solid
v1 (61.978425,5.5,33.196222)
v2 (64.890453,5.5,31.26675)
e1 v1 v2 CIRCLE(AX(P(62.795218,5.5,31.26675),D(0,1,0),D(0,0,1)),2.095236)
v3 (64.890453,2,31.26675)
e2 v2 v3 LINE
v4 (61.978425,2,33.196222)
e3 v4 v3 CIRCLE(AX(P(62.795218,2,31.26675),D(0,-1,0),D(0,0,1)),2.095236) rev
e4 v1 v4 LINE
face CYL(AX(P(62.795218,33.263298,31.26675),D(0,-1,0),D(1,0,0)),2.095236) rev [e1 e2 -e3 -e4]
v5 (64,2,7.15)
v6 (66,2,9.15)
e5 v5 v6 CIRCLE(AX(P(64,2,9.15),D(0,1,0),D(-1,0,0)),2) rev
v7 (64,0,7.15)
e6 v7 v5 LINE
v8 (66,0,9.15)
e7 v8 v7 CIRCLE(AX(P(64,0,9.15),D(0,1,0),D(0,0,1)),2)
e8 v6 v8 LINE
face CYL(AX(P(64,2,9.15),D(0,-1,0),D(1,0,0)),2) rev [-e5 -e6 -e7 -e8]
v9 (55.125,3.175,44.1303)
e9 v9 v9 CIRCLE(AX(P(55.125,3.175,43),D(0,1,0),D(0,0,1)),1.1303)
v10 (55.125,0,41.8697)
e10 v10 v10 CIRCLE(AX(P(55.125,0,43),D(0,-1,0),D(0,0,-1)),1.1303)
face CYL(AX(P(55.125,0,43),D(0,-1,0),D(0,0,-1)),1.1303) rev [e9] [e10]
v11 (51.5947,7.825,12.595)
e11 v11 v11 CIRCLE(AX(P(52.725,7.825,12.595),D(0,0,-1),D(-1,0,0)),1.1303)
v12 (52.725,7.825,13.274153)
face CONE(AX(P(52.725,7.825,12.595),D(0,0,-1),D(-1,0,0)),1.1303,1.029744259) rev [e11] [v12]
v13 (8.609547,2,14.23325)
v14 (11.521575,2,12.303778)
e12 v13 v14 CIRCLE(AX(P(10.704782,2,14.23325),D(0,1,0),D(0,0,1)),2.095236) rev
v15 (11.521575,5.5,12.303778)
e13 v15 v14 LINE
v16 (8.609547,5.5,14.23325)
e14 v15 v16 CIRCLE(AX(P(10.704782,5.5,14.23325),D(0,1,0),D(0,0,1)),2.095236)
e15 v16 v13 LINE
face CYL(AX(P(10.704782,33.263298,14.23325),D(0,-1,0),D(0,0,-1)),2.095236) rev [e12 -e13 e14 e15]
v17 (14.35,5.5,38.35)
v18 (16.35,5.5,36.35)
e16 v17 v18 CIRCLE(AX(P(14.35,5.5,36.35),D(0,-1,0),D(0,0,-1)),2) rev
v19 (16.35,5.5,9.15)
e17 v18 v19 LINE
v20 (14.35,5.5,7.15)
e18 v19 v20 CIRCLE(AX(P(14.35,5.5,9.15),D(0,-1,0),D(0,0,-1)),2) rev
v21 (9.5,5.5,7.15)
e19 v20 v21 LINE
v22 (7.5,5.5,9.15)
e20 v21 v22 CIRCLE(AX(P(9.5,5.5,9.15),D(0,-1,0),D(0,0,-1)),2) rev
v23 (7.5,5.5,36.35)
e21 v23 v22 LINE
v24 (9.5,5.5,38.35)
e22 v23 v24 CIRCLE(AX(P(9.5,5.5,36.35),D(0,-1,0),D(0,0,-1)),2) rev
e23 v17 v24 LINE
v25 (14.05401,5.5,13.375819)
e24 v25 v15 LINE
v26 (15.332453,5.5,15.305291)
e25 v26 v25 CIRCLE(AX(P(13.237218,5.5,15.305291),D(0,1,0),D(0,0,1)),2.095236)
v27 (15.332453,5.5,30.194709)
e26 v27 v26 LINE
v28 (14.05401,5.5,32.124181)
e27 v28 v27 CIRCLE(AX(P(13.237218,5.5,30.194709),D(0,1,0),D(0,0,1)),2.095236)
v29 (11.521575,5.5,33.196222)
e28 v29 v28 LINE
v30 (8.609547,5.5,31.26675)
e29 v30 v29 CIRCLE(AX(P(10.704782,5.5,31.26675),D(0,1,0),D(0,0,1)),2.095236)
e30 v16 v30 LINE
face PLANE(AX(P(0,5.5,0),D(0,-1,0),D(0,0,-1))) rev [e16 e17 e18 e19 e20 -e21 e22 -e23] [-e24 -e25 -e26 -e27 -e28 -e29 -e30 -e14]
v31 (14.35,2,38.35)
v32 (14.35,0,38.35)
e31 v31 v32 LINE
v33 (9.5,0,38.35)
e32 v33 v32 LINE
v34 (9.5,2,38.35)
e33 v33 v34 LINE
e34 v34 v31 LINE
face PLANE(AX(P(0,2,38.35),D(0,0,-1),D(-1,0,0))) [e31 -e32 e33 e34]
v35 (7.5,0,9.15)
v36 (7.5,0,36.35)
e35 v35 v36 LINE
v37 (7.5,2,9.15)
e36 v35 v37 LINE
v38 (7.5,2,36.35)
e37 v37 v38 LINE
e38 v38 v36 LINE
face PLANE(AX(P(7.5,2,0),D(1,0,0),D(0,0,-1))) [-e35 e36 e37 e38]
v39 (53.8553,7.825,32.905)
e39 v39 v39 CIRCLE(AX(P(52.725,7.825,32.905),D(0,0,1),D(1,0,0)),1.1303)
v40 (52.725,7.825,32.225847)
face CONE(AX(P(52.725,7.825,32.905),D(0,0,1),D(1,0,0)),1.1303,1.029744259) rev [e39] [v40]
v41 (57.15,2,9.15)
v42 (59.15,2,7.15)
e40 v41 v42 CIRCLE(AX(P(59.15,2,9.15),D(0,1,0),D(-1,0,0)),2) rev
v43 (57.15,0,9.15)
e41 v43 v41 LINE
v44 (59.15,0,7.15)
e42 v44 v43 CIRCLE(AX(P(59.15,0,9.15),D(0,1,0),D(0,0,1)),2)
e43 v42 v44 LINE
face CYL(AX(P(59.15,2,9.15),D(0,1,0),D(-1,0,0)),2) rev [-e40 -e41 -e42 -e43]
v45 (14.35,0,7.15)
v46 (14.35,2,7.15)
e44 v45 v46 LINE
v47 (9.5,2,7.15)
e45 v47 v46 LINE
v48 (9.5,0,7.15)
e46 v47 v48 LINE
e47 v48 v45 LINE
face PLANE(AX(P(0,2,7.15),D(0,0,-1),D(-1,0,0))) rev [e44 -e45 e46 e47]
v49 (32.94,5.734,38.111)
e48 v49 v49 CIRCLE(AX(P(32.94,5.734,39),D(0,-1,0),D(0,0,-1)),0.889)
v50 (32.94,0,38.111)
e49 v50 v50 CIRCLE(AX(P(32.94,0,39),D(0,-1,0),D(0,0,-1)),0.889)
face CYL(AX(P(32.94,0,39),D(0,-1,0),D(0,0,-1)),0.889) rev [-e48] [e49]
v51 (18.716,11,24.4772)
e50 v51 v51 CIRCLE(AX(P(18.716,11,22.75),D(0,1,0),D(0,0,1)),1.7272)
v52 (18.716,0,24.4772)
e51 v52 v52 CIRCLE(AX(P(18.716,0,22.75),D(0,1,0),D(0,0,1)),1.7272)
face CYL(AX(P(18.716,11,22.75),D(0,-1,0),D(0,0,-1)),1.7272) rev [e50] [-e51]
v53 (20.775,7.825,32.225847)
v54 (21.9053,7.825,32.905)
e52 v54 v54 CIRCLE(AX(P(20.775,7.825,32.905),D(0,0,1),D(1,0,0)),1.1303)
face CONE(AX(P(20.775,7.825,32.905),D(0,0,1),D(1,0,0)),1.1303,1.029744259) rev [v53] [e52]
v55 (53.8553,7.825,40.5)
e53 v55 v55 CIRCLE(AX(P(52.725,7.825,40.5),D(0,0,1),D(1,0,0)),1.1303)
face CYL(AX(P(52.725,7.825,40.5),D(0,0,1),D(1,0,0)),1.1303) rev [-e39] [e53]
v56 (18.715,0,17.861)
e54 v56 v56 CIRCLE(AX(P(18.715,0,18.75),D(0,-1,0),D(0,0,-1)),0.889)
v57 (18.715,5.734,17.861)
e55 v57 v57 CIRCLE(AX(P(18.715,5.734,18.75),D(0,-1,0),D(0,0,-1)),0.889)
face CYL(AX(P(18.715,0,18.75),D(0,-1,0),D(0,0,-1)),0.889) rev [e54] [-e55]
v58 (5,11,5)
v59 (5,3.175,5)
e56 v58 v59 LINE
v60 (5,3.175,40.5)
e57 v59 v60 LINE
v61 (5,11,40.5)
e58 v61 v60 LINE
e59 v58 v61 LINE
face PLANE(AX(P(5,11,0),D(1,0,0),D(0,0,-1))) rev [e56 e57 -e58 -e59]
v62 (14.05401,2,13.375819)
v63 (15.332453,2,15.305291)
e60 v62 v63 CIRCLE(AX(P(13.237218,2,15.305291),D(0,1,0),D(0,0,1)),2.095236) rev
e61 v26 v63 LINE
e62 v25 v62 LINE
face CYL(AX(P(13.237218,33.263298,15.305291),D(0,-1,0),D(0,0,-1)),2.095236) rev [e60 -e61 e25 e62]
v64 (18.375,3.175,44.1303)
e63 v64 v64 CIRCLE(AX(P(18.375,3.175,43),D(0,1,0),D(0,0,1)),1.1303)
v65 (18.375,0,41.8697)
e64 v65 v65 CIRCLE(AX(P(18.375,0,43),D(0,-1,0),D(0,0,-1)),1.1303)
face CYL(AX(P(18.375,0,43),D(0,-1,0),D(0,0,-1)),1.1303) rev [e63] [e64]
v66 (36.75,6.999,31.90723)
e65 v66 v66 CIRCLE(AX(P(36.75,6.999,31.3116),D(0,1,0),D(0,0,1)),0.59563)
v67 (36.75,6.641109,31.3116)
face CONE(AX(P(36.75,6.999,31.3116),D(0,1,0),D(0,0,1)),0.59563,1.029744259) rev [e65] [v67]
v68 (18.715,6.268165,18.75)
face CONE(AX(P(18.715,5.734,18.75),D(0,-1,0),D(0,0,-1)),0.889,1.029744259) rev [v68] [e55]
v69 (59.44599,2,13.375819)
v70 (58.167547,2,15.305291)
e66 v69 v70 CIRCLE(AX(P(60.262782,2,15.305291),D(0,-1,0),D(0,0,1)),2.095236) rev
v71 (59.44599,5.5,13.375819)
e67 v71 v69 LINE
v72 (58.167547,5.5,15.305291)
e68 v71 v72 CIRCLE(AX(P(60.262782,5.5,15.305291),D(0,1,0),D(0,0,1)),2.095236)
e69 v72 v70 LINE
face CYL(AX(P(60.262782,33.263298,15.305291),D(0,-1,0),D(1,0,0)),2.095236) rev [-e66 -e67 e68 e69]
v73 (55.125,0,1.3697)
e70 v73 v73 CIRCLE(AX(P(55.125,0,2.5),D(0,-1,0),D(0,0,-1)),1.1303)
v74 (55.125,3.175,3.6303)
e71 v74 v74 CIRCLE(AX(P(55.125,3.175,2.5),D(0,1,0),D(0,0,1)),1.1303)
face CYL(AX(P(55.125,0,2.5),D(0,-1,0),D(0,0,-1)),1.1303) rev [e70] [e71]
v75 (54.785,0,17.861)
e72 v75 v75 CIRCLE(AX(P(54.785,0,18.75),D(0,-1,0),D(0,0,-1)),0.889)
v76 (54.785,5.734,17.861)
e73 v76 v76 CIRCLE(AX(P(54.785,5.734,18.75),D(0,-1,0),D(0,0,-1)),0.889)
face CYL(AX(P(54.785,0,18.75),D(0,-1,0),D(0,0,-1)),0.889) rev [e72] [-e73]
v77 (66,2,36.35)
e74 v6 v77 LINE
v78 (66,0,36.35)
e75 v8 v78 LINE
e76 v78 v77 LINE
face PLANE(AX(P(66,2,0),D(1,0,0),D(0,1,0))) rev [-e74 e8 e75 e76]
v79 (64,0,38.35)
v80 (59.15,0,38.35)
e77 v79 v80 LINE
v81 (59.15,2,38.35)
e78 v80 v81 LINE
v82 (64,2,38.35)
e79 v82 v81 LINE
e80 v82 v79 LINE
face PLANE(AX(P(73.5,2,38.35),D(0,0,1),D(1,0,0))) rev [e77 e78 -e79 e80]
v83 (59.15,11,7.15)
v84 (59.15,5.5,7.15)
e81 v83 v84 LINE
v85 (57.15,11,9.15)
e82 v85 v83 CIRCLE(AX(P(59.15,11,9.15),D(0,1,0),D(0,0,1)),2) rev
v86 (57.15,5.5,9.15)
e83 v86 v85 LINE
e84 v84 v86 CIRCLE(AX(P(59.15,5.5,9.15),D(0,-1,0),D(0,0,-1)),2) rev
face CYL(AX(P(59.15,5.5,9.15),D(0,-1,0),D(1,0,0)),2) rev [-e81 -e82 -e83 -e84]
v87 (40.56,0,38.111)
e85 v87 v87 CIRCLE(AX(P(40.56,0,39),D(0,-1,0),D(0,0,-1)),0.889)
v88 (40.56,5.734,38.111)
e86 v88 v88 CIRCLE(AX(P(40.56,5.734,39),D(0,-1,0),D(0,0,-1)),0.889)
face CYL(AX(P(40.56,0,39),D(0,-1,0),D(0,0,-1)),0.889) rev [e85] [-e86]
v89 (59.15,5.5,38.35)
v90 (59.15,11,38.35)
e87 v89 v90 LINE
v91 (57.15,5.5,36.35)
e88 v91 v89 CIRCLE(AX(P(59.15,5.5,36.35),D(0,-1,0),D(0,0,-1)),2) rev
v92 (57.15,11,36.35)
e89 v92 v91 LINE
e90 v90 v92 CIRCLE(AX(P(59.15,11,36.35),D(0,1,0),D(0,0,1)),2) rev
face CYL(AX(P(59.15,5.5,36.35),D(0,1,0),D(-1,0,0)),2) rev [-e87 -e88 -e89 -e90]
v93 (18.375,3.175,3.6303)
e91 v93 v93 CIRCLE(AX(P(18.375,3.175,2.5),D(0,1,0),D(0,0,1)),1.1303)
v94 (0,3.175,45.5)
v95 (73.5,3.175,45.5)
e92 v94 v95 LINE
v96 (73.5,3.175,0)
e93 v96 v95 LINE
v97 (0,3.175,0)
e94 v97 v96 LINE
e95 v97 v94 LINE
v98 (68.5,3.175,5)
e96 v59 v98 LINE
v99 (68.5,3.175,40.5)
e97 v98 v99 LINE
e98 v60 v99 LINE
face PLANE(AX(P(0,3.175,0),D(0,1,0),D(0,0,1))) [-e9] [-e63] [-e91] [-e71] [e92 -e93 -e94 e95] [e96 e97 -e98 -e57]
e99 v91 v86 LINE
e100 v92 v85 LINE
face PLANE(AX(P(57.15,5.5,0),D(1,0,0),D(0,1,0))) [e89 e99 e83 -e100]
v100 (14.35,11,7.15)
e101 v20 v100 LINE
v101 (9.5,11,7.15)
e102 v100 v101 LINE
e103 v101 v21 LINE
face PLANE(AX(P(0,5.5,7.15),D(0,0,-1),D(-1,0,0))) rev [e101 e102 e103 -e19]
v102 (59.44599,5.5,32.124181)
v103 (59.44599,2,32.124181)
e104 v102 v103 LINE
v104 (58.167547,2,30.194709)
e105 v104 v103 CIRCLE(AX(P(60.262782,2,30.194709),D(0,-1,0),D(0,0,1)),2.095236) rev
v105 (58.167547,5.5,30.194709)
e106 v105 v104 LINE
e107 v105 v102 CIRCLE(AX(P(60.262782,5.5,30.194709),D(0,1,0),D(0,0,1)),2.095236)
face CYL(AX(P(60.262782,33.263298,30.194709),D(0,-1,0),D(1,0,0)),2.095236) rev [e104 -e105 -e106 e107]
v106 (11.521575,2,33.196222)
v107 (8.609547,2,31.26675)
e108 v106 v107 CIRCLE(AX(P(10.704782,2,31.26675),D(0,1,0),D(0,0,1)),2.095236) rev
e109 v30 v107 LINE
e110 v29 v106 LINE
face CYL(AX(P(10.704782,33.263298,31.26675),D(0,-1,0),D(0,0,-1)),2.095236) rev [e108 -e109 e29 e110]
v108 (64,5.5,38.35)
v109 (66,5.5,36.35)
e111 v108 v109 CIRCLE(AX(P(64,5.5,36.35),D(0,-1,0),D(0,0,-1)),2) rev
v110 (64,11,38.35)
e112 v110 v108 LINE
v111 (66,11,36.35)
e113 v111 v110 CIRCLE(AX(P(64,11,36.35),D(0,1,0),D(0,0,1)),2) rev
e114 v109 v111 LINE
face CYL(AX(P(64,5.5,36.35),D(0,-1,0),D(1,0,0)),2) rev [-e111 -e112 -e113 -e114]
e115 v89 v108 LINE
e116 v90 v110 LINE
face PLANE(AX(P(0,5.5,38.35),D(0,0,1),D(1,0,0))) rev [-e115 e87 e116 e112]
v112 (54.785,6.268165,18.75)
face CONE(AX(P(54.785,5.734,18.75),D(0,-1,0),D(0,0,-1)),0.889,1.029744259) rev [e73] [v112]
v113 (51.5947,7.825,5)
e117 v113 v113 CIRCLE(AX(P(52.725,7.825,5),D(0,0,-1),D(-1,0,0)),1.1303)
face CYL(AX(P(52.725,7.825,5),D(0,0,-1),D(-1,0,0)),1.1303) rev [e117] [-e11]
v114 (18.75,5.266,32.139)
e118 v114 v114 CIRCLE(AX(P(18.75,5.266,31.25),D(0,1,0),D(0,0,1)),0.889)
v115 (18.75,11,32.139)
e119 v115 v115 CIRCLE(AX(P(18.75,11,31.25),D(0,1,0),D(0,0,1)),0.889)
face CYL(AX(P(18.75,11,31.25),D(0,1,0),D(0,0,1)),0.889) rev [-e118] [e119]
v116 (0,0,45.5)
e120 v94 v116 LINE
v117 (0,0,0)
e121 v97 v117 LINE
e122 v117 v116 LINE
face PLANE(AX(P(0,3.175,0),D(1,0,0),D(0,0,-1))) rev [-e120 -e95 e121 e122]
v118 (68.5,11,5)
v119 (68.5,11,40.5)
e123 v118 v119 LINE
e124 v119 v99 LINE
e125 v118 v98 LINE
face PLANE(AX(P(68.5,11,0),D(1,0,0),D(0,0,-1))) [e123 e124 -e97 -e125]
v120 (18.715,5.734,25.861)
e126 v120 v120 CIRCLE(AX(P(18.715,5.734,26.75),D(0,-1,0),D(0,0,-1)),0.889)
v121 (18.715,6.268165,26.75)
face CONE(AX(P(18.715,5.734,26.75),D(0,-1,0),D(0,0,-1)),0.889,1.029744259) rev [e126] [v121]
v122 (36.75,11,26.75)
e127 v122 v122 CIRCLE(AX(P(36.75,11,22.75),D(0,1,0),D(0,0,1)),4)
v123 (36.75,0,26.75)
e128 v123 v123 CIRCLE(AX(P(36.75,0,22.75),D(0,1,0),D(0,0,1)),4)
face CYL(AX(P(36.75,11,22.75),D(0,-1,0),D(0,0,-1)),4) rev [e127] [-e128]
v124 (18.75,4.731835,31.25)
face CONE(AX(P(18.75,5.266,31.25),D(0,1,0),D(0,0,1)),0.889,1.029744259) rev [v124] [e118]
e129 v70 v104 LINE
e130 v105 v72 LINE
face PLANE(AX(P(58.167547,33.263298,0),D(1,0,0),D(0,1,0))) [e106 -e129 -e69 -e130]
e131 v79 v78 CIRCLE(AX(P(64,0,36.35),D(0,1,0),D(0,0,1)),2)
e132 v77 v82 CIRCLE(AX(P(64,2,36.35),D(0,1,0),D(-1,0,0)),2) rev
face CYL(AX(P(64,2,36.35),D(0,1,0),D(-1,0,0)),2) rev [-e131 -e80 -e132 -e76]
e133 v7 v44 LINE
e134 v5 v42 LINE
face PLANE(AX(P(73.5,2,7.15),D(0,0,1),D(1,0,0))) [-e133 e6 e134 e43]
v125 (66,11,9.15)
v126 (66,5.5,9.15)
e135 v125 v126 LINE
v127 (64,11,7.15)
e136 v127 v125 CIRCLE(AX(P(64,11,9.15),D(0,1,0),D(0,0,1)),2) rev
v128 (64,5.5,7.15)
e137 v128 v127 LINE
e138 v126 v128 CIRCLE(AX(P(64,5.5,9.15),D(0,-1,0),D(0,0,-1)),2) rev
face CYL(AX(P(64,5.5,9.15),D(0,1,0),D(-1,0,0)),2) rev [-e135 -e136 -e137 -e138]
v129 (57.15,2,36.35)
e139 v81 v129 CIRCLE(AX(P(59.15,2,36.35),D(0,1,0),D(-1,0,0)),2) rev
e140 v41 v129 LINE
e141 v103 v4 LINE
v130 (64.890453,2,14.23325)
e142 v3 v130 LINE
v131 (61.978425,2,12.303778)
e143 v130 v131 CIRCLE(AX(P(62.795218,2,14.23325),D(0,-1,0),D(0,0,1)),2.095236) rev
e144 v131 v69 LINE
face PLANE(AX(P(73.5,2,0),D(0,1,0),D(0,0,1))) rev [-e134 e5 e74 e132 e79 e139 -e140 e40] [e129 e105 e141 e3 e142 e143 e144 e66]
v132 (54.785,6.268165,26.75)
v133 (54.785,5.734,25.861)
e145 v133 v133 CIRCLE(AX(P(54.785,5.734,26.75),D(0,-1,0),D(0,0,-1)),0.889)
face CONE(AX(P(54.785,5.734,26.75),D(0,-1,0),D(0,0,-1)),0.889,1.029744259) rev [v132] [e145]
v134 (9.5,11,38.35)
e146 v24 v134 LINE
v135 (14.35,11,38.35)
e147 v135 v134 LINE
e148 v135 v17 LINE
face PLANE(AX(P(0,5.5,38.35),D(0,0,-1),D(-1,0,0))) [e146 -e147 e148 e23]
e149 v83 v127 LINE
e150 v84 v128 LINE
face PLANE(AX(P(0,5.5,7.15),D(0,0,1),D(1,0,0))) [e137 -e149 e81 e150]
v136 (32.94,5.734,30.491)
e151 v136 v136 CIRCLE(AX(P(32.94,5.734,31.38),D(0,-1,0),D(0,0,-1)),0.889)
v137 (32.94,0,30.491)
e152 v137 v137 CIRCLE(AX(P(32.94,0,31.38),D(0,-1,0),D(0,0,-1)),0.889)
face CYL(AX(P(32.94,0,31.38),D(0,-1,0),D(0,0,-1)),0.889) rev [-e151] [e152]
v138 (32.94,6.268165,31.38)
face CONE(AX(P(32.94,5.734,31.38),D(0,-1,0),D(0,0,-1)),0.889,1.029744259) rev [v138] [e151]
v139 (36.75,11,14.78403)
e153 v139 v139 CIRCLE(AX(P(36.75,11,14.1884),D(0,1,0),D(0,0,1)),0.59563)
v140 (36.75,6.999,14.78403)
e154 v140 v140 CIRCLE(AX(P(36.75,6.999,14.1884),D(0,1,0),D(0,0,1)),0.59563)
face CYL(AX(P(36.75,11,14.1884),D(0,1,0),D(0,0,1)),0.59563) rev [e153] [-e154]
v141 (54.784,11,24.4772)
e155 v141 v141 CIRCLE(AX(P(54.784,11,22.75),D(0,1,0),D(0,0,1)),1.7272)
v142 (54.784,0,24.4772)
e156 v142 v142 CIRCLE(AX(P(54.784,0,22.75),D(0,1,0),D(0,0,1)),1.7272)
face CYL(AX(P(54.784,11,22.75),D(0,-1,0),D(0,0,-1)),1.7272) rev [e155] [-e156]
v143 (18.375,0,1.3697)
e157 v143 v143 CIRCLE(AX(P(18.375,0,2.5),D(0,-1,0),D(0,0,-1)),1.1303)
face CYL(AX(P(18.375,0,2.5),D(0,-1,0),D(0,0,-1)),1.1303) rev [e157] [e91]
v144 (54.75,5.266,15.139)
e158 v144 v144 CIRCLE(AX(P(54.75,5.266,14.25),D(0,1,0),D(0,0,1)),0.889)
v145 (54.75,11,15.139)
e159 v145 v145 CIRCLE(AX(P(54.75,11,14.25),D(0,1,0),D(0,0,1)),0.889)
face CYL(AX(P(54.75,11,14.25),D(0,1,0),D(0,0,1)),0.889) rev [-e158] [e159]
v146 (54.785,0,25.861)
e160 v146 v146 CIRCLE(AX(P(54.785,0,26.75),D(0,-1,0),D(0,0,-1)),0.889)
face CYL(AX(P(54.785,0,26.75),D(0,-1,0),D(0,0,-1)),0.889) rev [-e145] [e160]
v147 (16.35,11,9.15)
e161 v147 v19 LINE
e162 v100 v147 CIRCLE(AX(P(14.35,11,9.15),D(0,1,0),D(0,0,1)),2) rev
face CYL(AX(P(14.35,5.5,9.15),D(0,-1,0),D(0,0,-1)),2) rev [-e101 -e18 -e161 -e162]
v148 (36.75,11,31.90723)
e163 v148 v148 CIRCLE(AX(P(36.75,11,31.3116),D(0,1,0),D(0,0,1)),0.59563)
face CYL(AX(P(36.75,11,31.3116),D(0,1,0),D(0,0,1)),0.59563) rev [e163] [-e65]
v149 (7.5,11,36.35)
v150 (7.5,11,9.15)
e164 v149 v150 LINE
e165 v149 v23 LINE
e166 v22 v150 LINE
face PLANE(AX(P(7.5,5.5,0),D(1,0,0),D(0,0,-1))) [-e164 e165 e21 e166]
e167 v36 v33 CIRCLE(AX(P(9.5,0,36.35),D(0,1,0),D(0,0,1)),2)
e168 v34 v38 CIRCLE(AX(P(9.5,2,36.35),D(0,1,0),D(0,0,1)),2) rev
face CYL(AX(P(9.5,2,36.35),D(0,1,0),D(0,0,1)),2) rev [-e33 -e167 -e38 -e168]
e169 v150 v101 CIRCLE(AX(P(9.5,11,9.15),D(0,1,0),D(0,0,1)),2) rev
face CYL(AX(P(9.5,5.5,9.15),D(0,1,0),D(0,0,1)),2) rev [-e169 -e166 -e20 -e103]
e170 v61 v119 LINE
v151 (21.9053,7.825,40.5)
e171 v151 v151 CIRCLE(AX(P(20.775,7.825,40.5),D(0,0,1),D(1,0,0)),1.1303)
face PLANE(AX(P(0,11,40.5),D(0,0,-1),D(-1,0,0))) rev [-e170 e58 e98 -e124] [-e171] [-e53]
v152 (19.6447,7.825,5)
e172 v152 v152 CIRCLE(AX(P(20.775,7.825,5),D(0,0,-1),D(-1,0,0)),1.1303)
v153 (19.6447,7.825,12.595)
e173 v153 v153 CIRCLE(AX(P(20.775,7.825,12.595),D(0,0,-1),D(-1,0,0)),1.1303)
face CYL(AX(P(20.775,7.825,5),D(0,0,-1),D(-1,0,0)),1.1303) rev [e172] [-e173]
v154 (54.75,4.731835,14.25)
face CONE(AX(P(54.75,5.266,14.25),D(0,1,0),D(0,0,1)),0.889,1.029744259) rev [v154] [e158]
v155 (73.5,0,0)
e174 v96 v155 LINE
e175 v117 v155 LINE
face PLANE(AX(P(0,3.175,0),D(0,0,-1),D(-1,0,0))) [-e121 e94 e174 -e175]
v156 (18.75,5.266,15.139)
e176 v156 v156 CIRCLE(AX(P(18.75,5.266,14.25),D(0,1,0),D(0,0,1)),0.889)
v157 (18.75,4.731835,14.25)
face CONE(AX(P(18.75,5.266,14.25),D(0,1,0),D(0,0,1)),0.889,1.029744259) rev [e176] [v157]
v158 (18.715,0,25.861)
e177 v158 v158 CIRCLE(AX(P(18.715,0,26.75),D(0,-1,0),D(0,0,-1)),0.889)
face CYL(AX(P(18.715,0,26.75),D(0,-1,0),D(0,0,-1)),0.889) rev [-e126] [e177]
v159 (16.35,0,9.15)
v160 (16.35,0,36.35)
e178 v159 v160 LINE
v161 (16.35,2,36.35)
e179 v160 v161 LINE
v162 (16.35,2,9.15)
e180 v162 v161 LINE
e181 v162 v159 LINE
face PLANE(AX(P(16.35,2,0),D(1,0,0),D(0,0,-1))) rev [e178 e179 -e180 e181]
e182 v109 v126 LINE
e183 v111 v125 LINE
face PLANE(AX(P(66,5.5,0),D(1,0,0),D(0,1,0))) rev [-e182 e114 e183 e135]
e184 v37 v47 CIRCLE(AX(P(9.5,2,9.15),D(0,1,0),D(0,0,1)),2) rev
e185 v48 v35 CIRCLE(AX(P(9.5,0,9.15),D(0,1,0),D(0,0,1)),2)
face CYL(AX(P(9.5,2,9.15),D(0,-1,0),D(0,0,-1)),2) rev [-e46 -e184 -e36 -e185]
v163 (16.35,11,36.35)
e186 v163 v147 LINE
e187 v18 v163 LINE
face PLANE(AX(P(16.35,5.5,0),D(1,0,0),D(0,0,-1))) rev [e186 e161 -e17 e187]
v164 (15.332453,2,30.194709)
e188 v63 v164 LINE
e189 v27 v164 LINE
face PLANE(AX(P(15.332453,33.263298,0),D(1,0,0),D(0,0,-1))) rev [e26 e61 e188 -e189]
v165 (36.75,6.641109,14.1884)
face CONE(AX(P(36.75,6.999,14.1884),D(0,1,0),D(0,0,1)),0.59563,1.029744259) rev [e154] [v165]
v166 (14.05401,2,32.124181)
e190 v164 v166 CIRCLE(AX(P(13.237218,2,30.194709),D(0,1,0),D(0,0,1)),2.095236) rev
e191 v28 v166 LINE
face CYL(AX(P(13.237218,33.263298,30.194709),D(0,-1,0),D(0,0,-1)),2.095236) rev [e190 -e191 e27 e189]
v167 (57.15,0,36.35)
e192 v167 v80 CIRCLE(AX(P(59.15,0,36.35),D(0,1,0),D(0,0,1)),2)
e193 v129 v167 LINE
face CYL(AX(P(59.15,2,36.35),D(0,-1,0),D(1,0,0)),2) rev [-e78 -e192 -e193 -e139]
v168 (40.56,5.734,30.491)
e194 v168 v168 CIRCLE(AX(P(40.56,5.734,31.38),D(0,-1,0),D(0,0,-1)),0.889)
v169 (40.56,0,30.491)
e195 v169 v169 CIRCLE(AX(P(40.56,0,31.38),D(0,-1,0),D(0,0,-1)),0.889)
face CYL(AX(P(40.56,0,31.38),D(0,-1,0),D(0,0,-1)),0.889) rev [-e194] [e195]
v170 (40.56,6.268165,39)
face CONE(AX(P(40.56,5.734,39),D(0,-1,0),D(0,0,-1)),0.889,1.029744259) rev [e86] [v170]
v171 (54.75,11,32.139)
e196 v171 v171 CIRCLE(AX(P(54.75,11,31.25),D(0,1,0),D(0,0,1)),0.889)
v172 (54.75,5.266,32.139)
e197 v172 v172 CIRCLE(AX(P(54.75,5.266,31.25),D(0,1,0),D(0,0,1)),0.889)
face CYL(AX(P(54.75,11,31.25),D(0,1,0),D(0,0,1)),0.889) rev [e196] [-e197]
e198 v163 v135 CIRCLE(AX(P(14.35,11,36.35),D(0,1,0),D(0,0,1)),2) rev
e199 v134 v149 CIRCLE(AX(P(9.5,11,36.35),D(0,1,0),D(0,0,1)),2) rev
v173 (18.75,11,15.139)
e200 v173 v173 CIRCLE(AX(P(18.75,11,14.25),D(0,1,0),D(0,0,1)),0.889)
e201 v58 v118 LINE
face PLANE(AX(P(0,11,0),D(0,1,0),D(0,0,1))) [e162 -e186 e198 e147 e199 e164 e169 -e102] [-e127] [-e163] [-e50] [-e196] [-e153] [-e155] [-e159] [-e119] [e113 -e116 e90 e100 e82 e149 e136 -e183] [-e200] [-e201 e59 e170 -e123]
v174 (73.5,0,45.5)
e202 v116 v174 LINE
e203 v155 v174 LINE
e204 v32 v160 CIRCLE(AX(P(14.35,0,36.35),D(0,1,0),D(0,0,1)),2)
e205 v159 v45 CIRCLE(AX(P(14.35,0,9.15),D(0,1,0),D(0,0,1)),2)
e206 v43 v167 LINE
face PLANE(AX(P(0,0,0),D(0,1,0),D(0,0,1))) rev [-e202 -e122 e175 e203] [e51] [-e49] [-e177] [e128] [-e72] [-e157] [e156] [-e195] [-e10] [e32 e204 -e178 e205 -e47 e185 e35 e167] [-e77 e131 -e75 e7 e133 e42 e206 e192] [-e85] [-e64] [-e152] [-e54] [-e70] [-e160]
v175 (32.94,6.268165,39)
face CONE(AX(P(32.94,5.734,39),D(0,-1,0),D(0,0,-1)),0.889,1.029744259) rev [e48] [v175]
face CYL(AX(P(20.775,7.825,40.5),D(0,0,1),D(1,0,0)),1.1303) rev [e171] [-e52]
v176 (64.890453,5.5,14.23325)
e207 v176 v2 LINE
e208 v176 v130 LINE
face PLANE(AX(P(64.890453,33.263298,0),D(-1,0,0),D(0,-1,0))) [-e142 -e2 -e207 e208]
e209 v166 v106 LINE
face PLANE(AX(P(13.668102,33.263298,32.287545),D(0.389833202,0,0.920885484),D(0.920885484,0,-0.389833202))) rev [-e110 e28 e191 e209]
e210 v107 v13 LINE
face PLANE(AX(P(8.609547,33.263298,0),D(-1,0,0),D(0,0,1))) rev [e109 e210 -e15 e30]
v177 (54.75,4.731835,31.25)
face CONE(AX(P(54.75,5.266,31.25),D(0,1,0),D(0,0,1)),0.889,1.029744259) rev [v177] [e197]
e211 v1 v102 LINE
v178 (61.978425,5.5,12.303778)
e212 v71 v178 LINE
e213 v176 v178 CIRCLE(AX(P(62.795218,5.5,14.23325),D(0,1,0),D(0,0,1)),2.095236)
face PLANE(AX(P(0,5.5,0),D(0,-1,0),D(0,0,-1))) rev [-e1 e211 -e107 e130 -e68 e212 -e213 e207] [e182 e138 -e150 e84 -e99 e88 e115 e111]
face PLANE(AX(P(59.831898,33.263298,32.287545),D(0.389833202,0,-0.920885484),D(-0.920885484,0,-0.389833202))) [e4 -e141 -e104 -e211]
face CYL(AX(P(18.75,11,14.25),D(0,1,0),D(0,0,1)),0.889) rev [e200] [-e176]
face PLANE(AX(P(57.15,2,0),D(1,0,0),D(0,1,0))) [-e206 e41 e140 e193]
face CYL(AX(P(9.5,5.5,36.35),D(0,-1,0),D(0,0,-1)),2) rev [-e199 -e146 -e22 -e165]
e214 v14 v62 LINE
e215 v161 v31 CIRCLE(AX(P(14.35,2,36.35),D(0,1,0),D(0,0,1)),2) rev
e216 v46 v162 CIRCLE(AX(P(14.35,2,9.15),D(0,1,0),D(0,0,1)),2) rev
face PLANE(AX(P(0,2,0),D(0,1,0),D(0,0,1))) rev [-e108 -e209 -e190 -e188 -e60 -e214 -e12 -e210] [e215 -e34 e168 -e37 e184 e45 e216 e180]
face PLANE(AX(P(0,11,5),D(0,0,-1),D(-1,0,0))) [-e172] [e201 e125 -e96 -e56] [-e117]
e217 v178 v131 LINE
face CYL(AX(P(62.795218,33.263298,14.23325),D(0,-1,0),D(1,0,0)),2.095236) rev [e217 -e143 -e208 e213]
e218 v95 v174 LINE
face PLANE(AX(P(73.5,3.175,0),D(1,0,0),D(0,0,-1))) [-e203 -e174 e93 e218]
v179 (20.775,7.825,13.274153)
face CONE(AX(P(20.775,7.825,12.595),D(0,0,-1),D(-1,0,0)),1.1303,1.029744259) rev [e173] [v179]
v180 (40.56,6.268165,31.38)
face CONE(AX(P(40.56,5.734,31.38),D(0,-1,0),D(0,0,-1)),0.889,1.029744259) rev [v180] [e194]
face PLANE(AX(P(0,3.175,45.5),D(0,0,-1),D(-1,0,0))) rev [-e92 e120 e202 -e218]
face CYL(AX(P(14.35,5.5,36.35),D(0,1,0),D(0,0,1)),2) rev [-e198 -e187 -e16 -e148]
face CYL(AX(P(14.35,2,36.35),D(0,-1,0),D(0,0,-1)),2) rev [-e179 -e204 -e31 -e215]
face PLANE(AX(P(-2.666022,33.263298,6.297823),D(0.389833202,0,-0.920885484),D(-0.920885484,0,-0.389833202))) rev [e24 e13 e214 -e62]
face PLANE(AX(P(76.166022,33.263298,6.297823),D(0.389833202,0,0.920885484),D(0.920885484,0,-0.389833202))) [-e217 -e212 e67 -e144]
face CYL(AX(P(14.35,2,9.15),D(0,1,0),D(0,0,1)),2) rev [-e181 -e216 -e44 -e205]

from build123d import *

# Parameters (mm, degrees)
MAIN_SKETCH_W                         = 73.5
MAIN_SKETCH_H                         = 45.5
MAIN_SKETCH_W_2                       = 63.5
MAIN_SKETCH_H_2                       = 35.5
LIP_DEPTH                             = 3.175
MOUNTING_BASE_OUTLINE_W               = 63.5
MOUNTING_BASE_OUTLINE_H               = 35.5
MOUNTING_BASE_OUTLINE_R               = 1.7272
MOUNTING_BASE_OUTLINE_R_2             = 4
MOUNTING_BASE_DEPTH                   = 11
HEATER_CART_4_40_TAPS_D               = 2.2606
HEATER_CART_4_40_TAPS_DEPTH           = 7.595
HEATER_CART_4_40_TAPS_TIP             = 0.679152758
HEATER_CART_4_40_TAPS_ON_FACE_2_D     = 2.2606
HEATER_CART_4_40_TAPS_ON_FACE_2_DEPTH = 7.595
HEATER_CART_4_40_TAPS_ON_FACE_2_TIP   = 0.679152758
MAIN_SKETCH_12_W                      = 8.85
MAIN_SKETCH_12_H                      = 31.2
BOTTOM_SQUARE_CUTOUT_DEPTH            = 2
SQUARE_MICRO_D_CUTOUT_START           = 5.5
SQUARE_MICRO_D_CUTOUT_OUTLINE_W       = 8.85
SQUARE_MICRO_D_CUTOUT_OUTLINE_H       = 31.2
SQUARE_MICRO_D_CUTOUT_DEPTH           = 5.5
MAIN_SKETCH_7_R                       = 0.285
ROUND_MICRO_D_CUTOUT_DEPTH            = 11
INTERNAL_CORNER_CUTOUTS_FILLET_R      = 2
CHIP_CLAMP_0_80_TAPS_AT_2_COUNT       = 2
CHIP_CLAMP_0_80_TAPS_AT_2_PITCH       = 17.1232
CHIP_CLAMP_0_80_TAPS_AT_3_COUNT       = 2
CHIP_CLAMP_0_80_TAPS_AT_3_PITCH       = 17.1232
F_2_56_CLOSE_CLEAR_43_0_089_D         = 2.2606
PCB_2_56_TAPS_D                       = 1.778
PCB_2_56_TAPS_DEPTH                   = 5.734
PCB_2_56_TAPS_TIP                     = 0.53416509
BOTTOM_COVER_2_56_TAPS_D              = 1.778
BOTTOM_COVER_2_56_TAPS_DEPTH          = 5.734
BOTTOM_COVER_2_56_TAPS_TIP            = 0.53416509
F_2_56_TAPPED_HOLE1_D                 = 1.778
F_2_56_TAPPED_HOLE1_DEPTH             = 5.734
F_2_56_TAPPED_HOLE1_TIP               = 0.53416509


# Read off the part's stored shape, not the designer's step: Mounting_Base, Square_Micro_D_Cutout
with BuildPart() as part:
    # Main_Sketch → Lip (new body)
    with BuildSketch(Plane(origin=(0, 0, 0), x_dir=(1, 0, 0), z_dir=(0, 1, 0))):
        with Locations((36.75, -22.75)):
            Rectangle(MAIN_SKETCH_W, MAIN_SKETCH_H)
        with Locations((36.75, -22.75)):
            Rectangle(MAIN_SKETCH_W_2, MAIN_SKETCH_H_2, mode=Mode.SUBTRACT)
    extrude(amount=LIP_DEPTH)

    # Mounting_Base outline → Mounting_Base (add)
    with BuildSketch(Plane(origin=(0, 0, 0), x_dir=(1, 0, 0), z_dir=(0, 1, 0))):
        with Locations((36.75, -22.75)):
            Rectangle(MOUNTING_BASE_OUTLINE_W, MOUNTING_BASE_OUTLINE_H)
        with Locations((18.716, -22.75)):
            Circle(MOUNTING_BASE_OUTLINE_R, mode=Mode.SUBTRACT)
        with Locations((36.75, -22.75)):
            Circle(MOUNTING_BASE_OUTLINE_R_2, mode=Mode.SUBTRACT)
        with Locations((54.784, -22.75)):
            Circle(MOUNTING_BASE_OUTLINE_R, mode=Mode.SUBTRACT)
    extrude(amount=MOUNTING_BASE_DEPTH)

    # Heater_Cart_#4-40_Taps
    with Locations(Plane(origin=(52.725, 7.825, 5), x_dir=(-1, 0, 0), z_dir=(0, 0, -1))):
        with Locations((0, 0), (31.95, 0)):
            Hole(HEATER_CART_4_40_TAPS_D / 2, depth=HEATER_CART_4_40_TAPS_DEPTH)
            with Locations((0, 0, -(HEATER_CART_4_40_TAPS_DEPTH + HEATER_CART_4_40_TAPS_TIP / 2))):  # 118° drill point
                Cone(0, HEATER_CART_4_40_TAPS_D / 2, HEATER_CART_4_40_TAPS_TIP, mode=Mode.SUBTRACT)

    # Heater_Cart_#4-40_Taps on face 2
    with Locations(Plane(origin=(20.775, 7.825, 40.5), x_dir=(1, 0, 0), z_dir=(0, 0, 1))):
        with Locations((0, 0), (31.95, 0)):
            Hole(HEATER_CART_4_40_TAPS_ON_FACE_2_D / 2, depth=HEATER_CART_4_40_TAPS_ON_FACE_2_DEPTH)
            with Locations((0, 0, -(HEATER_CART_4_40_TAPS_ON_FACE_2_DEPTH + HEATER_CART_4_40_TAPS_ON_FACE_2_TIP / 2))):  # 118° drill point
                Cone(0, HEATER_CART_4_40_TAPS_ON_FACE_2_D / 2, HEATER_CART_4_40_TAPS_ON_FACE_2_TIP, mode=Mode.SUBTRACT)

    # Main_Sketch<12> → Bottom_square_cutout (cut)
    with BuildSketch(Plane(origin=(0, 0, 0), x_dir=(1, 0, 0), z_dir=(0, 1, 0))):
        with Locations((11.925, -22.75)):
            Rectangle(MAIN_SKETCH_12_W, MAIN_SKETCH_12_H)
        with BuildLine():
            ThreePointArc((11.521574965, -33.196222286), (10.496212222, -33.351578951), (9.521946869, -32.996175702))
            ThreePointArc((9.521946869, -32.996175702), (8.851632057, -32.244424217), (8.609546604, -31.26675))
            Line((8.609546604, -31.26675), (8.609546604, -14.23325))
            ThreePointArc((8.609546604, -14.23325), (8.851632057, -13.255575783), (9.521946869, -12.503824298))
            ThreePointArc((9.521946869, -12.503824298), (10.496212222, -12.148421049), (11.521574965, -12.303777714))
            Line((11.521574965, -12.303777714), (14.054010046, -13.37581902))
            ThreePointArc((14.054010046, -13.37581902), (14.983840891, -14.148001292), (15.3324534, -15.305291306))
            Line((15.3324534, -15.305291306), (15.3324534, -30.194708694))
            ThreePointArc((15.3324534, -30.194708694), (14.983840891, -31.351998708), (14.054010046, -32.12418098))
            Line((14.054010046, -32.12418098), (11.521574965, -33.196222286))
        make_face(mode=Mode.SUBTRACT)
    bottom_square_cutout = extrude(amount=BOTTOM_SQUARE_CUTOUT_DEPTH, mode=Mode.SUBTRACT)

    # Square_Micro_D_Cutout outline → Square_Micro_D_Cutout (cut)
    with BuildSketch(Plane(origin=(0, 0, 0), x_dir=(1, 0, 0), z_dir=(0, 1, 0)).offset(SQUARE_MICRO_D_CUTOUT_START)):
        with Locations((11.925, -22.75)):
            Rectangle(SQUARE_MICRO_D_CUTOUT_OUTLINE_W, SQUARE_MICRO_D_CUTOUT_OUTLINE_H)
        with BuildLine():
            ThreePointArc((11.521574965, -33.196222286), (9.547492447, -33.013373348), (8.609546604, -31.26675))
            Line((8.609546604, -31.26675), (8.609546604, -14.23325))
            ThreePointArc((8.609546604, -14.23325), (9.547492447, -12.486626652), (11.521574965, -12.303777714))
            Line((11.521574965, -12.303777714), (14.054010046, -13.37581902))
            ThreePointArc((14.054010046, -13.37581902), (14.983840891, -14.148001291), (15.3324534, -15.305291306))
            Line((15.3324534, -15.305291306), (15.3324534, -30.194708694))
            ThreePointArc((15.3324534, -30.194708694), (14.983840891, -31.351998709), (14.054010046, -32.12418098))
            Line((14.054010046, -32.12418098), (11.521574965, -33.196222286))
        make_face(mode=Mode.SUBTRACT)
    square_micro_d_cutout = extrude(amount=SQUARE_MICRO_D_CUTOUT_DEPTH, mode=Mode.SUBTRACT)

    # Main_Sketch<7> → Round_Micro_D_Cutout (cut)
    # profile 1 of 2: a face of its own
    with BuildSketch(Plane(origin=(0, 0, 0), x_dir=(1, 0, 0), z_dir=(0, 1, 0))):
        with BuildLine():
            ThreePointArc((9.521946869, -32.996175702), (8.851632057, -32.244424217), (8.609546604, -31.26675))
            Line((8.609546604, -31.26675), (8.609546604, -14.23325))
            ThreePointArc((8.609546604, -14.23325), (8.851632057, -13.255575783), (9.521946869, -12.503824298))
            ThreePointArc((9.521946869, -12.503824298), (10.496212222, -12.148421049), (11.521574965, -12.303777714))
            Line((11.521574965, -12.303777714), (14.054010046, -13.37581902))
            ThreePointArc((14.054010046, -13.37581902), (14.983840891, -14.148001292), (15.3324534, -15.305291306))
            Line((15.3324534, -15.305291306), (15.3324534, -30.194708694))
            ThreePointArc((15.3324534, -30.194708694), (14.983840891, -31.351998708), (14.054010046, -32.12418098))
            Line((14.054010046, -32.12418098), (11.521574965, -33.196222286))
            ThreePointArc((11.521574965, -33.196222286), (10.496212222, -33.351578951), (9.521946869, -32.996175702))
        make_face()
        with Locations((11.399546604, -22.75)):
            Circle(MAIN_SKETCH_7_R, mode=Mode.SUBTRACT)
    # profile 2 of 2: a face of its own
    with BuildSketch(Plane(origin=(0, 0, 0), x_dir=(1, 0, 0), z_dir=(0, 1, 0))):
        with Locations((11.399546604, -22.75)):
            Circle(MAIN_SKETCH_7_R)
    round_micro_d_cutout = extrude(amount=ROUND_MICRO_D_CUTOUT_DEPTH, mode=Mode.SUBTRACT)

    # MicroD_Mirror: Bottom_square_cutout, Square_Micro_D_Cutout, Round_Micro_D_Cutout across plane
    add(bottom_square_cutout.mirror(Plane(origin=(36.75, 0, 0), x_dir=(0, 0, 1), z_dir=(1, 0, 0))), mode=Mode.SUBTRACT)
    add(square_micro_d_cutout.mirror(Plane(origin=(36.75, 0, 0), x_dir=(0, 0, 1), z_dir=(1, 0, 0))), mode=Mode.SUBTRACT)
    add(round_micro_d_cutout.mirror(Plane(origin=(36.75, 0, 0), x_dir=(0, 0, 1), z_dir=(1, 0, 0))), mode=Mode.SUBTRACT)

    # Internal_Corner_cutouts_fillet
    internal_corner_cutouts_fillet_edges = [part.edges().sort_by_distance(p)[0] for p in [
        (16.35, 8.25, 38.35),
        (7.5, 8.25, 38.35),
        (7.5, 8.25, 7.15),
        (16.35, 8.25, 7.15),
        (57.15, 1, 7.15),
        (57.15, 1, 38.35),
        (66, 1, 38.35),
        (66, 1, 7.15),
        (66, 8.25, 7.15),
        (66, 8.25, 38.35),
        (57.15, 8.25, 38.35),
        (57.15, 8.25, 7.15),
        (16.35, 1, 38.35),
        (16.35, 1, 7.15),
        (7.5, 1, 7.15),
        (7.5, 1, 38.35),
    ]]
    fillet(internal_corner_cutouts_fillet_edges, radius=INTERNAL_CORNER_CUTOUTS_FILLET_R)

    # Sketch3 → Chip_Clamp_#0-80 Taps (revolve, cut)
    with BuildSketch(Plane(origin=(36.75, 11, 31.3116), x_dir=(0, 0, 1), z_dir=(1, 0, 0))):
        Polygon((0, 0), (0, 4.358890611), (0.59563, 4.001), (0.59563, 0), align=None)
    chip_clamp_0_80_taps = revolve(axis=Axis((36.75, 17.35, 31.3116), (0, -1, 0)), mode=Mode.SUBTRACT)

    # Chip_Clamp_#0-80 Taps at 2: Chip_Clamp_#0-80 Taps ×2
    with Locations(*[(0, 0, -i * CHIP_CLAMP_0_80_TAPS_AT_2_PITCH) for i in range(1, CHIP_CLAMP_0_80_TAPS_AT_2_COUNT)]):
        add(chip_clamp_0_80_taps, mode=Mode.SUBTRACT)

    # Chip_Clamp_#0-80 Taps at 3: Chip_Clamp_#0-80 Taps ×2
    with Locations(*[(0, 0, -i * CHIP_CLAMP_0_80_TAPS_AT_3_PITCH) for i in range(1, CHIP_CLAMP_0_80_TAPS_AT_3_COUNT)]):
        add(chip_clamp_0_80_taps, mode=Mode.SUBTRACT)

    # 2-56_Close_Clear#43 (0.089) (through all)
    with Locations(Plane(origin=(18.375, 0, 43), x_dir=(0, 0, -1), z_dir=(0, -1, 0))):
        with Locations((0, 0), (40.5, 0), (40.5, 36.75), (0, 36.75)):
            Hole(F_2_56_CLOSE_CLEAR_43_0_089_D / 2)

    # PCB #2-56 Taps
    with Locations(Plane(origin=(18.75, 11, 14.25), x_dir=(0, 0, 1), z_dir=(0, 1, 0))):
        with Locations((0, 0), (17, 0), (0, 36), (17, 36)):
            Hole(PCB_2_56_TAPS_D / 2, depth=PCB_2_56_TAPS_DEPTH)
            with Locations((0, 0, -(PCB_2_56_TAPS_DEPTH + PCB_2_56_TAPS_TIP / 2))):  # 118° drill point
                Cone(0, PCB_2_56_TAPS_D / 2, PCB_2_56_TAPS_TIP, mode=Mode.SUBTRACT)

    # Bottom_Cover#2-56 Taps
    with Locations(Plane(origin=(54.785, 0, 18.750000125), x_dir=(0, 0, -1), z_dir=(0, -1, 0))):
        with Locations((0, 0), (-8, 0), (-8, -36.07), (0, -36.07)):
            Hole(BOTTOM_COVER_2_56_TAPS_D / 2, depth=BOTTOM_COVER_2_56_TAPS_DEPTH)
            with Locations((0, 0, -(BOTTOM_COVER_2_56_TAPS_DEPTH + BOTTOM_COVER_2_56_TAPS_TIP / 2))):  # 118° drill point
                Cone(0, BOTTOM_COVER_2_56_TAPS_D / 2, BOTTOM_COVER_2_56_TAPS_TIP, mode=Mode.SUBTRACT)

    # #2-56 Tapped Hole1
    with Locations(Plane(origin=(32.94, 0, 31.38), x_dir=(0, 0, -1), z_dir=(0, -1, 0))):
        with Locations((0, 0), (-7.62, 0), (-7.62, 7.62), (0, 7.62)):
            Hole(F_2_56_TAPPED_HOLE1_D / 2, depth=F_2_56_TAPPED_HOLE1_DEPTH)
            with Locations((0, 0, -(F_2_56_TAPPED_HOLE1_DEPTH + F_2_56_TAPPED_HOLE1_TIP / 2))):  # 118° drill point
                Cone(0, F_2_56_TAPPED_HOLE1_D / 2, F_2_56_TAPPED_HOLE1_TIP, mode=Mode.SUBTRACT)


solid = part.part
